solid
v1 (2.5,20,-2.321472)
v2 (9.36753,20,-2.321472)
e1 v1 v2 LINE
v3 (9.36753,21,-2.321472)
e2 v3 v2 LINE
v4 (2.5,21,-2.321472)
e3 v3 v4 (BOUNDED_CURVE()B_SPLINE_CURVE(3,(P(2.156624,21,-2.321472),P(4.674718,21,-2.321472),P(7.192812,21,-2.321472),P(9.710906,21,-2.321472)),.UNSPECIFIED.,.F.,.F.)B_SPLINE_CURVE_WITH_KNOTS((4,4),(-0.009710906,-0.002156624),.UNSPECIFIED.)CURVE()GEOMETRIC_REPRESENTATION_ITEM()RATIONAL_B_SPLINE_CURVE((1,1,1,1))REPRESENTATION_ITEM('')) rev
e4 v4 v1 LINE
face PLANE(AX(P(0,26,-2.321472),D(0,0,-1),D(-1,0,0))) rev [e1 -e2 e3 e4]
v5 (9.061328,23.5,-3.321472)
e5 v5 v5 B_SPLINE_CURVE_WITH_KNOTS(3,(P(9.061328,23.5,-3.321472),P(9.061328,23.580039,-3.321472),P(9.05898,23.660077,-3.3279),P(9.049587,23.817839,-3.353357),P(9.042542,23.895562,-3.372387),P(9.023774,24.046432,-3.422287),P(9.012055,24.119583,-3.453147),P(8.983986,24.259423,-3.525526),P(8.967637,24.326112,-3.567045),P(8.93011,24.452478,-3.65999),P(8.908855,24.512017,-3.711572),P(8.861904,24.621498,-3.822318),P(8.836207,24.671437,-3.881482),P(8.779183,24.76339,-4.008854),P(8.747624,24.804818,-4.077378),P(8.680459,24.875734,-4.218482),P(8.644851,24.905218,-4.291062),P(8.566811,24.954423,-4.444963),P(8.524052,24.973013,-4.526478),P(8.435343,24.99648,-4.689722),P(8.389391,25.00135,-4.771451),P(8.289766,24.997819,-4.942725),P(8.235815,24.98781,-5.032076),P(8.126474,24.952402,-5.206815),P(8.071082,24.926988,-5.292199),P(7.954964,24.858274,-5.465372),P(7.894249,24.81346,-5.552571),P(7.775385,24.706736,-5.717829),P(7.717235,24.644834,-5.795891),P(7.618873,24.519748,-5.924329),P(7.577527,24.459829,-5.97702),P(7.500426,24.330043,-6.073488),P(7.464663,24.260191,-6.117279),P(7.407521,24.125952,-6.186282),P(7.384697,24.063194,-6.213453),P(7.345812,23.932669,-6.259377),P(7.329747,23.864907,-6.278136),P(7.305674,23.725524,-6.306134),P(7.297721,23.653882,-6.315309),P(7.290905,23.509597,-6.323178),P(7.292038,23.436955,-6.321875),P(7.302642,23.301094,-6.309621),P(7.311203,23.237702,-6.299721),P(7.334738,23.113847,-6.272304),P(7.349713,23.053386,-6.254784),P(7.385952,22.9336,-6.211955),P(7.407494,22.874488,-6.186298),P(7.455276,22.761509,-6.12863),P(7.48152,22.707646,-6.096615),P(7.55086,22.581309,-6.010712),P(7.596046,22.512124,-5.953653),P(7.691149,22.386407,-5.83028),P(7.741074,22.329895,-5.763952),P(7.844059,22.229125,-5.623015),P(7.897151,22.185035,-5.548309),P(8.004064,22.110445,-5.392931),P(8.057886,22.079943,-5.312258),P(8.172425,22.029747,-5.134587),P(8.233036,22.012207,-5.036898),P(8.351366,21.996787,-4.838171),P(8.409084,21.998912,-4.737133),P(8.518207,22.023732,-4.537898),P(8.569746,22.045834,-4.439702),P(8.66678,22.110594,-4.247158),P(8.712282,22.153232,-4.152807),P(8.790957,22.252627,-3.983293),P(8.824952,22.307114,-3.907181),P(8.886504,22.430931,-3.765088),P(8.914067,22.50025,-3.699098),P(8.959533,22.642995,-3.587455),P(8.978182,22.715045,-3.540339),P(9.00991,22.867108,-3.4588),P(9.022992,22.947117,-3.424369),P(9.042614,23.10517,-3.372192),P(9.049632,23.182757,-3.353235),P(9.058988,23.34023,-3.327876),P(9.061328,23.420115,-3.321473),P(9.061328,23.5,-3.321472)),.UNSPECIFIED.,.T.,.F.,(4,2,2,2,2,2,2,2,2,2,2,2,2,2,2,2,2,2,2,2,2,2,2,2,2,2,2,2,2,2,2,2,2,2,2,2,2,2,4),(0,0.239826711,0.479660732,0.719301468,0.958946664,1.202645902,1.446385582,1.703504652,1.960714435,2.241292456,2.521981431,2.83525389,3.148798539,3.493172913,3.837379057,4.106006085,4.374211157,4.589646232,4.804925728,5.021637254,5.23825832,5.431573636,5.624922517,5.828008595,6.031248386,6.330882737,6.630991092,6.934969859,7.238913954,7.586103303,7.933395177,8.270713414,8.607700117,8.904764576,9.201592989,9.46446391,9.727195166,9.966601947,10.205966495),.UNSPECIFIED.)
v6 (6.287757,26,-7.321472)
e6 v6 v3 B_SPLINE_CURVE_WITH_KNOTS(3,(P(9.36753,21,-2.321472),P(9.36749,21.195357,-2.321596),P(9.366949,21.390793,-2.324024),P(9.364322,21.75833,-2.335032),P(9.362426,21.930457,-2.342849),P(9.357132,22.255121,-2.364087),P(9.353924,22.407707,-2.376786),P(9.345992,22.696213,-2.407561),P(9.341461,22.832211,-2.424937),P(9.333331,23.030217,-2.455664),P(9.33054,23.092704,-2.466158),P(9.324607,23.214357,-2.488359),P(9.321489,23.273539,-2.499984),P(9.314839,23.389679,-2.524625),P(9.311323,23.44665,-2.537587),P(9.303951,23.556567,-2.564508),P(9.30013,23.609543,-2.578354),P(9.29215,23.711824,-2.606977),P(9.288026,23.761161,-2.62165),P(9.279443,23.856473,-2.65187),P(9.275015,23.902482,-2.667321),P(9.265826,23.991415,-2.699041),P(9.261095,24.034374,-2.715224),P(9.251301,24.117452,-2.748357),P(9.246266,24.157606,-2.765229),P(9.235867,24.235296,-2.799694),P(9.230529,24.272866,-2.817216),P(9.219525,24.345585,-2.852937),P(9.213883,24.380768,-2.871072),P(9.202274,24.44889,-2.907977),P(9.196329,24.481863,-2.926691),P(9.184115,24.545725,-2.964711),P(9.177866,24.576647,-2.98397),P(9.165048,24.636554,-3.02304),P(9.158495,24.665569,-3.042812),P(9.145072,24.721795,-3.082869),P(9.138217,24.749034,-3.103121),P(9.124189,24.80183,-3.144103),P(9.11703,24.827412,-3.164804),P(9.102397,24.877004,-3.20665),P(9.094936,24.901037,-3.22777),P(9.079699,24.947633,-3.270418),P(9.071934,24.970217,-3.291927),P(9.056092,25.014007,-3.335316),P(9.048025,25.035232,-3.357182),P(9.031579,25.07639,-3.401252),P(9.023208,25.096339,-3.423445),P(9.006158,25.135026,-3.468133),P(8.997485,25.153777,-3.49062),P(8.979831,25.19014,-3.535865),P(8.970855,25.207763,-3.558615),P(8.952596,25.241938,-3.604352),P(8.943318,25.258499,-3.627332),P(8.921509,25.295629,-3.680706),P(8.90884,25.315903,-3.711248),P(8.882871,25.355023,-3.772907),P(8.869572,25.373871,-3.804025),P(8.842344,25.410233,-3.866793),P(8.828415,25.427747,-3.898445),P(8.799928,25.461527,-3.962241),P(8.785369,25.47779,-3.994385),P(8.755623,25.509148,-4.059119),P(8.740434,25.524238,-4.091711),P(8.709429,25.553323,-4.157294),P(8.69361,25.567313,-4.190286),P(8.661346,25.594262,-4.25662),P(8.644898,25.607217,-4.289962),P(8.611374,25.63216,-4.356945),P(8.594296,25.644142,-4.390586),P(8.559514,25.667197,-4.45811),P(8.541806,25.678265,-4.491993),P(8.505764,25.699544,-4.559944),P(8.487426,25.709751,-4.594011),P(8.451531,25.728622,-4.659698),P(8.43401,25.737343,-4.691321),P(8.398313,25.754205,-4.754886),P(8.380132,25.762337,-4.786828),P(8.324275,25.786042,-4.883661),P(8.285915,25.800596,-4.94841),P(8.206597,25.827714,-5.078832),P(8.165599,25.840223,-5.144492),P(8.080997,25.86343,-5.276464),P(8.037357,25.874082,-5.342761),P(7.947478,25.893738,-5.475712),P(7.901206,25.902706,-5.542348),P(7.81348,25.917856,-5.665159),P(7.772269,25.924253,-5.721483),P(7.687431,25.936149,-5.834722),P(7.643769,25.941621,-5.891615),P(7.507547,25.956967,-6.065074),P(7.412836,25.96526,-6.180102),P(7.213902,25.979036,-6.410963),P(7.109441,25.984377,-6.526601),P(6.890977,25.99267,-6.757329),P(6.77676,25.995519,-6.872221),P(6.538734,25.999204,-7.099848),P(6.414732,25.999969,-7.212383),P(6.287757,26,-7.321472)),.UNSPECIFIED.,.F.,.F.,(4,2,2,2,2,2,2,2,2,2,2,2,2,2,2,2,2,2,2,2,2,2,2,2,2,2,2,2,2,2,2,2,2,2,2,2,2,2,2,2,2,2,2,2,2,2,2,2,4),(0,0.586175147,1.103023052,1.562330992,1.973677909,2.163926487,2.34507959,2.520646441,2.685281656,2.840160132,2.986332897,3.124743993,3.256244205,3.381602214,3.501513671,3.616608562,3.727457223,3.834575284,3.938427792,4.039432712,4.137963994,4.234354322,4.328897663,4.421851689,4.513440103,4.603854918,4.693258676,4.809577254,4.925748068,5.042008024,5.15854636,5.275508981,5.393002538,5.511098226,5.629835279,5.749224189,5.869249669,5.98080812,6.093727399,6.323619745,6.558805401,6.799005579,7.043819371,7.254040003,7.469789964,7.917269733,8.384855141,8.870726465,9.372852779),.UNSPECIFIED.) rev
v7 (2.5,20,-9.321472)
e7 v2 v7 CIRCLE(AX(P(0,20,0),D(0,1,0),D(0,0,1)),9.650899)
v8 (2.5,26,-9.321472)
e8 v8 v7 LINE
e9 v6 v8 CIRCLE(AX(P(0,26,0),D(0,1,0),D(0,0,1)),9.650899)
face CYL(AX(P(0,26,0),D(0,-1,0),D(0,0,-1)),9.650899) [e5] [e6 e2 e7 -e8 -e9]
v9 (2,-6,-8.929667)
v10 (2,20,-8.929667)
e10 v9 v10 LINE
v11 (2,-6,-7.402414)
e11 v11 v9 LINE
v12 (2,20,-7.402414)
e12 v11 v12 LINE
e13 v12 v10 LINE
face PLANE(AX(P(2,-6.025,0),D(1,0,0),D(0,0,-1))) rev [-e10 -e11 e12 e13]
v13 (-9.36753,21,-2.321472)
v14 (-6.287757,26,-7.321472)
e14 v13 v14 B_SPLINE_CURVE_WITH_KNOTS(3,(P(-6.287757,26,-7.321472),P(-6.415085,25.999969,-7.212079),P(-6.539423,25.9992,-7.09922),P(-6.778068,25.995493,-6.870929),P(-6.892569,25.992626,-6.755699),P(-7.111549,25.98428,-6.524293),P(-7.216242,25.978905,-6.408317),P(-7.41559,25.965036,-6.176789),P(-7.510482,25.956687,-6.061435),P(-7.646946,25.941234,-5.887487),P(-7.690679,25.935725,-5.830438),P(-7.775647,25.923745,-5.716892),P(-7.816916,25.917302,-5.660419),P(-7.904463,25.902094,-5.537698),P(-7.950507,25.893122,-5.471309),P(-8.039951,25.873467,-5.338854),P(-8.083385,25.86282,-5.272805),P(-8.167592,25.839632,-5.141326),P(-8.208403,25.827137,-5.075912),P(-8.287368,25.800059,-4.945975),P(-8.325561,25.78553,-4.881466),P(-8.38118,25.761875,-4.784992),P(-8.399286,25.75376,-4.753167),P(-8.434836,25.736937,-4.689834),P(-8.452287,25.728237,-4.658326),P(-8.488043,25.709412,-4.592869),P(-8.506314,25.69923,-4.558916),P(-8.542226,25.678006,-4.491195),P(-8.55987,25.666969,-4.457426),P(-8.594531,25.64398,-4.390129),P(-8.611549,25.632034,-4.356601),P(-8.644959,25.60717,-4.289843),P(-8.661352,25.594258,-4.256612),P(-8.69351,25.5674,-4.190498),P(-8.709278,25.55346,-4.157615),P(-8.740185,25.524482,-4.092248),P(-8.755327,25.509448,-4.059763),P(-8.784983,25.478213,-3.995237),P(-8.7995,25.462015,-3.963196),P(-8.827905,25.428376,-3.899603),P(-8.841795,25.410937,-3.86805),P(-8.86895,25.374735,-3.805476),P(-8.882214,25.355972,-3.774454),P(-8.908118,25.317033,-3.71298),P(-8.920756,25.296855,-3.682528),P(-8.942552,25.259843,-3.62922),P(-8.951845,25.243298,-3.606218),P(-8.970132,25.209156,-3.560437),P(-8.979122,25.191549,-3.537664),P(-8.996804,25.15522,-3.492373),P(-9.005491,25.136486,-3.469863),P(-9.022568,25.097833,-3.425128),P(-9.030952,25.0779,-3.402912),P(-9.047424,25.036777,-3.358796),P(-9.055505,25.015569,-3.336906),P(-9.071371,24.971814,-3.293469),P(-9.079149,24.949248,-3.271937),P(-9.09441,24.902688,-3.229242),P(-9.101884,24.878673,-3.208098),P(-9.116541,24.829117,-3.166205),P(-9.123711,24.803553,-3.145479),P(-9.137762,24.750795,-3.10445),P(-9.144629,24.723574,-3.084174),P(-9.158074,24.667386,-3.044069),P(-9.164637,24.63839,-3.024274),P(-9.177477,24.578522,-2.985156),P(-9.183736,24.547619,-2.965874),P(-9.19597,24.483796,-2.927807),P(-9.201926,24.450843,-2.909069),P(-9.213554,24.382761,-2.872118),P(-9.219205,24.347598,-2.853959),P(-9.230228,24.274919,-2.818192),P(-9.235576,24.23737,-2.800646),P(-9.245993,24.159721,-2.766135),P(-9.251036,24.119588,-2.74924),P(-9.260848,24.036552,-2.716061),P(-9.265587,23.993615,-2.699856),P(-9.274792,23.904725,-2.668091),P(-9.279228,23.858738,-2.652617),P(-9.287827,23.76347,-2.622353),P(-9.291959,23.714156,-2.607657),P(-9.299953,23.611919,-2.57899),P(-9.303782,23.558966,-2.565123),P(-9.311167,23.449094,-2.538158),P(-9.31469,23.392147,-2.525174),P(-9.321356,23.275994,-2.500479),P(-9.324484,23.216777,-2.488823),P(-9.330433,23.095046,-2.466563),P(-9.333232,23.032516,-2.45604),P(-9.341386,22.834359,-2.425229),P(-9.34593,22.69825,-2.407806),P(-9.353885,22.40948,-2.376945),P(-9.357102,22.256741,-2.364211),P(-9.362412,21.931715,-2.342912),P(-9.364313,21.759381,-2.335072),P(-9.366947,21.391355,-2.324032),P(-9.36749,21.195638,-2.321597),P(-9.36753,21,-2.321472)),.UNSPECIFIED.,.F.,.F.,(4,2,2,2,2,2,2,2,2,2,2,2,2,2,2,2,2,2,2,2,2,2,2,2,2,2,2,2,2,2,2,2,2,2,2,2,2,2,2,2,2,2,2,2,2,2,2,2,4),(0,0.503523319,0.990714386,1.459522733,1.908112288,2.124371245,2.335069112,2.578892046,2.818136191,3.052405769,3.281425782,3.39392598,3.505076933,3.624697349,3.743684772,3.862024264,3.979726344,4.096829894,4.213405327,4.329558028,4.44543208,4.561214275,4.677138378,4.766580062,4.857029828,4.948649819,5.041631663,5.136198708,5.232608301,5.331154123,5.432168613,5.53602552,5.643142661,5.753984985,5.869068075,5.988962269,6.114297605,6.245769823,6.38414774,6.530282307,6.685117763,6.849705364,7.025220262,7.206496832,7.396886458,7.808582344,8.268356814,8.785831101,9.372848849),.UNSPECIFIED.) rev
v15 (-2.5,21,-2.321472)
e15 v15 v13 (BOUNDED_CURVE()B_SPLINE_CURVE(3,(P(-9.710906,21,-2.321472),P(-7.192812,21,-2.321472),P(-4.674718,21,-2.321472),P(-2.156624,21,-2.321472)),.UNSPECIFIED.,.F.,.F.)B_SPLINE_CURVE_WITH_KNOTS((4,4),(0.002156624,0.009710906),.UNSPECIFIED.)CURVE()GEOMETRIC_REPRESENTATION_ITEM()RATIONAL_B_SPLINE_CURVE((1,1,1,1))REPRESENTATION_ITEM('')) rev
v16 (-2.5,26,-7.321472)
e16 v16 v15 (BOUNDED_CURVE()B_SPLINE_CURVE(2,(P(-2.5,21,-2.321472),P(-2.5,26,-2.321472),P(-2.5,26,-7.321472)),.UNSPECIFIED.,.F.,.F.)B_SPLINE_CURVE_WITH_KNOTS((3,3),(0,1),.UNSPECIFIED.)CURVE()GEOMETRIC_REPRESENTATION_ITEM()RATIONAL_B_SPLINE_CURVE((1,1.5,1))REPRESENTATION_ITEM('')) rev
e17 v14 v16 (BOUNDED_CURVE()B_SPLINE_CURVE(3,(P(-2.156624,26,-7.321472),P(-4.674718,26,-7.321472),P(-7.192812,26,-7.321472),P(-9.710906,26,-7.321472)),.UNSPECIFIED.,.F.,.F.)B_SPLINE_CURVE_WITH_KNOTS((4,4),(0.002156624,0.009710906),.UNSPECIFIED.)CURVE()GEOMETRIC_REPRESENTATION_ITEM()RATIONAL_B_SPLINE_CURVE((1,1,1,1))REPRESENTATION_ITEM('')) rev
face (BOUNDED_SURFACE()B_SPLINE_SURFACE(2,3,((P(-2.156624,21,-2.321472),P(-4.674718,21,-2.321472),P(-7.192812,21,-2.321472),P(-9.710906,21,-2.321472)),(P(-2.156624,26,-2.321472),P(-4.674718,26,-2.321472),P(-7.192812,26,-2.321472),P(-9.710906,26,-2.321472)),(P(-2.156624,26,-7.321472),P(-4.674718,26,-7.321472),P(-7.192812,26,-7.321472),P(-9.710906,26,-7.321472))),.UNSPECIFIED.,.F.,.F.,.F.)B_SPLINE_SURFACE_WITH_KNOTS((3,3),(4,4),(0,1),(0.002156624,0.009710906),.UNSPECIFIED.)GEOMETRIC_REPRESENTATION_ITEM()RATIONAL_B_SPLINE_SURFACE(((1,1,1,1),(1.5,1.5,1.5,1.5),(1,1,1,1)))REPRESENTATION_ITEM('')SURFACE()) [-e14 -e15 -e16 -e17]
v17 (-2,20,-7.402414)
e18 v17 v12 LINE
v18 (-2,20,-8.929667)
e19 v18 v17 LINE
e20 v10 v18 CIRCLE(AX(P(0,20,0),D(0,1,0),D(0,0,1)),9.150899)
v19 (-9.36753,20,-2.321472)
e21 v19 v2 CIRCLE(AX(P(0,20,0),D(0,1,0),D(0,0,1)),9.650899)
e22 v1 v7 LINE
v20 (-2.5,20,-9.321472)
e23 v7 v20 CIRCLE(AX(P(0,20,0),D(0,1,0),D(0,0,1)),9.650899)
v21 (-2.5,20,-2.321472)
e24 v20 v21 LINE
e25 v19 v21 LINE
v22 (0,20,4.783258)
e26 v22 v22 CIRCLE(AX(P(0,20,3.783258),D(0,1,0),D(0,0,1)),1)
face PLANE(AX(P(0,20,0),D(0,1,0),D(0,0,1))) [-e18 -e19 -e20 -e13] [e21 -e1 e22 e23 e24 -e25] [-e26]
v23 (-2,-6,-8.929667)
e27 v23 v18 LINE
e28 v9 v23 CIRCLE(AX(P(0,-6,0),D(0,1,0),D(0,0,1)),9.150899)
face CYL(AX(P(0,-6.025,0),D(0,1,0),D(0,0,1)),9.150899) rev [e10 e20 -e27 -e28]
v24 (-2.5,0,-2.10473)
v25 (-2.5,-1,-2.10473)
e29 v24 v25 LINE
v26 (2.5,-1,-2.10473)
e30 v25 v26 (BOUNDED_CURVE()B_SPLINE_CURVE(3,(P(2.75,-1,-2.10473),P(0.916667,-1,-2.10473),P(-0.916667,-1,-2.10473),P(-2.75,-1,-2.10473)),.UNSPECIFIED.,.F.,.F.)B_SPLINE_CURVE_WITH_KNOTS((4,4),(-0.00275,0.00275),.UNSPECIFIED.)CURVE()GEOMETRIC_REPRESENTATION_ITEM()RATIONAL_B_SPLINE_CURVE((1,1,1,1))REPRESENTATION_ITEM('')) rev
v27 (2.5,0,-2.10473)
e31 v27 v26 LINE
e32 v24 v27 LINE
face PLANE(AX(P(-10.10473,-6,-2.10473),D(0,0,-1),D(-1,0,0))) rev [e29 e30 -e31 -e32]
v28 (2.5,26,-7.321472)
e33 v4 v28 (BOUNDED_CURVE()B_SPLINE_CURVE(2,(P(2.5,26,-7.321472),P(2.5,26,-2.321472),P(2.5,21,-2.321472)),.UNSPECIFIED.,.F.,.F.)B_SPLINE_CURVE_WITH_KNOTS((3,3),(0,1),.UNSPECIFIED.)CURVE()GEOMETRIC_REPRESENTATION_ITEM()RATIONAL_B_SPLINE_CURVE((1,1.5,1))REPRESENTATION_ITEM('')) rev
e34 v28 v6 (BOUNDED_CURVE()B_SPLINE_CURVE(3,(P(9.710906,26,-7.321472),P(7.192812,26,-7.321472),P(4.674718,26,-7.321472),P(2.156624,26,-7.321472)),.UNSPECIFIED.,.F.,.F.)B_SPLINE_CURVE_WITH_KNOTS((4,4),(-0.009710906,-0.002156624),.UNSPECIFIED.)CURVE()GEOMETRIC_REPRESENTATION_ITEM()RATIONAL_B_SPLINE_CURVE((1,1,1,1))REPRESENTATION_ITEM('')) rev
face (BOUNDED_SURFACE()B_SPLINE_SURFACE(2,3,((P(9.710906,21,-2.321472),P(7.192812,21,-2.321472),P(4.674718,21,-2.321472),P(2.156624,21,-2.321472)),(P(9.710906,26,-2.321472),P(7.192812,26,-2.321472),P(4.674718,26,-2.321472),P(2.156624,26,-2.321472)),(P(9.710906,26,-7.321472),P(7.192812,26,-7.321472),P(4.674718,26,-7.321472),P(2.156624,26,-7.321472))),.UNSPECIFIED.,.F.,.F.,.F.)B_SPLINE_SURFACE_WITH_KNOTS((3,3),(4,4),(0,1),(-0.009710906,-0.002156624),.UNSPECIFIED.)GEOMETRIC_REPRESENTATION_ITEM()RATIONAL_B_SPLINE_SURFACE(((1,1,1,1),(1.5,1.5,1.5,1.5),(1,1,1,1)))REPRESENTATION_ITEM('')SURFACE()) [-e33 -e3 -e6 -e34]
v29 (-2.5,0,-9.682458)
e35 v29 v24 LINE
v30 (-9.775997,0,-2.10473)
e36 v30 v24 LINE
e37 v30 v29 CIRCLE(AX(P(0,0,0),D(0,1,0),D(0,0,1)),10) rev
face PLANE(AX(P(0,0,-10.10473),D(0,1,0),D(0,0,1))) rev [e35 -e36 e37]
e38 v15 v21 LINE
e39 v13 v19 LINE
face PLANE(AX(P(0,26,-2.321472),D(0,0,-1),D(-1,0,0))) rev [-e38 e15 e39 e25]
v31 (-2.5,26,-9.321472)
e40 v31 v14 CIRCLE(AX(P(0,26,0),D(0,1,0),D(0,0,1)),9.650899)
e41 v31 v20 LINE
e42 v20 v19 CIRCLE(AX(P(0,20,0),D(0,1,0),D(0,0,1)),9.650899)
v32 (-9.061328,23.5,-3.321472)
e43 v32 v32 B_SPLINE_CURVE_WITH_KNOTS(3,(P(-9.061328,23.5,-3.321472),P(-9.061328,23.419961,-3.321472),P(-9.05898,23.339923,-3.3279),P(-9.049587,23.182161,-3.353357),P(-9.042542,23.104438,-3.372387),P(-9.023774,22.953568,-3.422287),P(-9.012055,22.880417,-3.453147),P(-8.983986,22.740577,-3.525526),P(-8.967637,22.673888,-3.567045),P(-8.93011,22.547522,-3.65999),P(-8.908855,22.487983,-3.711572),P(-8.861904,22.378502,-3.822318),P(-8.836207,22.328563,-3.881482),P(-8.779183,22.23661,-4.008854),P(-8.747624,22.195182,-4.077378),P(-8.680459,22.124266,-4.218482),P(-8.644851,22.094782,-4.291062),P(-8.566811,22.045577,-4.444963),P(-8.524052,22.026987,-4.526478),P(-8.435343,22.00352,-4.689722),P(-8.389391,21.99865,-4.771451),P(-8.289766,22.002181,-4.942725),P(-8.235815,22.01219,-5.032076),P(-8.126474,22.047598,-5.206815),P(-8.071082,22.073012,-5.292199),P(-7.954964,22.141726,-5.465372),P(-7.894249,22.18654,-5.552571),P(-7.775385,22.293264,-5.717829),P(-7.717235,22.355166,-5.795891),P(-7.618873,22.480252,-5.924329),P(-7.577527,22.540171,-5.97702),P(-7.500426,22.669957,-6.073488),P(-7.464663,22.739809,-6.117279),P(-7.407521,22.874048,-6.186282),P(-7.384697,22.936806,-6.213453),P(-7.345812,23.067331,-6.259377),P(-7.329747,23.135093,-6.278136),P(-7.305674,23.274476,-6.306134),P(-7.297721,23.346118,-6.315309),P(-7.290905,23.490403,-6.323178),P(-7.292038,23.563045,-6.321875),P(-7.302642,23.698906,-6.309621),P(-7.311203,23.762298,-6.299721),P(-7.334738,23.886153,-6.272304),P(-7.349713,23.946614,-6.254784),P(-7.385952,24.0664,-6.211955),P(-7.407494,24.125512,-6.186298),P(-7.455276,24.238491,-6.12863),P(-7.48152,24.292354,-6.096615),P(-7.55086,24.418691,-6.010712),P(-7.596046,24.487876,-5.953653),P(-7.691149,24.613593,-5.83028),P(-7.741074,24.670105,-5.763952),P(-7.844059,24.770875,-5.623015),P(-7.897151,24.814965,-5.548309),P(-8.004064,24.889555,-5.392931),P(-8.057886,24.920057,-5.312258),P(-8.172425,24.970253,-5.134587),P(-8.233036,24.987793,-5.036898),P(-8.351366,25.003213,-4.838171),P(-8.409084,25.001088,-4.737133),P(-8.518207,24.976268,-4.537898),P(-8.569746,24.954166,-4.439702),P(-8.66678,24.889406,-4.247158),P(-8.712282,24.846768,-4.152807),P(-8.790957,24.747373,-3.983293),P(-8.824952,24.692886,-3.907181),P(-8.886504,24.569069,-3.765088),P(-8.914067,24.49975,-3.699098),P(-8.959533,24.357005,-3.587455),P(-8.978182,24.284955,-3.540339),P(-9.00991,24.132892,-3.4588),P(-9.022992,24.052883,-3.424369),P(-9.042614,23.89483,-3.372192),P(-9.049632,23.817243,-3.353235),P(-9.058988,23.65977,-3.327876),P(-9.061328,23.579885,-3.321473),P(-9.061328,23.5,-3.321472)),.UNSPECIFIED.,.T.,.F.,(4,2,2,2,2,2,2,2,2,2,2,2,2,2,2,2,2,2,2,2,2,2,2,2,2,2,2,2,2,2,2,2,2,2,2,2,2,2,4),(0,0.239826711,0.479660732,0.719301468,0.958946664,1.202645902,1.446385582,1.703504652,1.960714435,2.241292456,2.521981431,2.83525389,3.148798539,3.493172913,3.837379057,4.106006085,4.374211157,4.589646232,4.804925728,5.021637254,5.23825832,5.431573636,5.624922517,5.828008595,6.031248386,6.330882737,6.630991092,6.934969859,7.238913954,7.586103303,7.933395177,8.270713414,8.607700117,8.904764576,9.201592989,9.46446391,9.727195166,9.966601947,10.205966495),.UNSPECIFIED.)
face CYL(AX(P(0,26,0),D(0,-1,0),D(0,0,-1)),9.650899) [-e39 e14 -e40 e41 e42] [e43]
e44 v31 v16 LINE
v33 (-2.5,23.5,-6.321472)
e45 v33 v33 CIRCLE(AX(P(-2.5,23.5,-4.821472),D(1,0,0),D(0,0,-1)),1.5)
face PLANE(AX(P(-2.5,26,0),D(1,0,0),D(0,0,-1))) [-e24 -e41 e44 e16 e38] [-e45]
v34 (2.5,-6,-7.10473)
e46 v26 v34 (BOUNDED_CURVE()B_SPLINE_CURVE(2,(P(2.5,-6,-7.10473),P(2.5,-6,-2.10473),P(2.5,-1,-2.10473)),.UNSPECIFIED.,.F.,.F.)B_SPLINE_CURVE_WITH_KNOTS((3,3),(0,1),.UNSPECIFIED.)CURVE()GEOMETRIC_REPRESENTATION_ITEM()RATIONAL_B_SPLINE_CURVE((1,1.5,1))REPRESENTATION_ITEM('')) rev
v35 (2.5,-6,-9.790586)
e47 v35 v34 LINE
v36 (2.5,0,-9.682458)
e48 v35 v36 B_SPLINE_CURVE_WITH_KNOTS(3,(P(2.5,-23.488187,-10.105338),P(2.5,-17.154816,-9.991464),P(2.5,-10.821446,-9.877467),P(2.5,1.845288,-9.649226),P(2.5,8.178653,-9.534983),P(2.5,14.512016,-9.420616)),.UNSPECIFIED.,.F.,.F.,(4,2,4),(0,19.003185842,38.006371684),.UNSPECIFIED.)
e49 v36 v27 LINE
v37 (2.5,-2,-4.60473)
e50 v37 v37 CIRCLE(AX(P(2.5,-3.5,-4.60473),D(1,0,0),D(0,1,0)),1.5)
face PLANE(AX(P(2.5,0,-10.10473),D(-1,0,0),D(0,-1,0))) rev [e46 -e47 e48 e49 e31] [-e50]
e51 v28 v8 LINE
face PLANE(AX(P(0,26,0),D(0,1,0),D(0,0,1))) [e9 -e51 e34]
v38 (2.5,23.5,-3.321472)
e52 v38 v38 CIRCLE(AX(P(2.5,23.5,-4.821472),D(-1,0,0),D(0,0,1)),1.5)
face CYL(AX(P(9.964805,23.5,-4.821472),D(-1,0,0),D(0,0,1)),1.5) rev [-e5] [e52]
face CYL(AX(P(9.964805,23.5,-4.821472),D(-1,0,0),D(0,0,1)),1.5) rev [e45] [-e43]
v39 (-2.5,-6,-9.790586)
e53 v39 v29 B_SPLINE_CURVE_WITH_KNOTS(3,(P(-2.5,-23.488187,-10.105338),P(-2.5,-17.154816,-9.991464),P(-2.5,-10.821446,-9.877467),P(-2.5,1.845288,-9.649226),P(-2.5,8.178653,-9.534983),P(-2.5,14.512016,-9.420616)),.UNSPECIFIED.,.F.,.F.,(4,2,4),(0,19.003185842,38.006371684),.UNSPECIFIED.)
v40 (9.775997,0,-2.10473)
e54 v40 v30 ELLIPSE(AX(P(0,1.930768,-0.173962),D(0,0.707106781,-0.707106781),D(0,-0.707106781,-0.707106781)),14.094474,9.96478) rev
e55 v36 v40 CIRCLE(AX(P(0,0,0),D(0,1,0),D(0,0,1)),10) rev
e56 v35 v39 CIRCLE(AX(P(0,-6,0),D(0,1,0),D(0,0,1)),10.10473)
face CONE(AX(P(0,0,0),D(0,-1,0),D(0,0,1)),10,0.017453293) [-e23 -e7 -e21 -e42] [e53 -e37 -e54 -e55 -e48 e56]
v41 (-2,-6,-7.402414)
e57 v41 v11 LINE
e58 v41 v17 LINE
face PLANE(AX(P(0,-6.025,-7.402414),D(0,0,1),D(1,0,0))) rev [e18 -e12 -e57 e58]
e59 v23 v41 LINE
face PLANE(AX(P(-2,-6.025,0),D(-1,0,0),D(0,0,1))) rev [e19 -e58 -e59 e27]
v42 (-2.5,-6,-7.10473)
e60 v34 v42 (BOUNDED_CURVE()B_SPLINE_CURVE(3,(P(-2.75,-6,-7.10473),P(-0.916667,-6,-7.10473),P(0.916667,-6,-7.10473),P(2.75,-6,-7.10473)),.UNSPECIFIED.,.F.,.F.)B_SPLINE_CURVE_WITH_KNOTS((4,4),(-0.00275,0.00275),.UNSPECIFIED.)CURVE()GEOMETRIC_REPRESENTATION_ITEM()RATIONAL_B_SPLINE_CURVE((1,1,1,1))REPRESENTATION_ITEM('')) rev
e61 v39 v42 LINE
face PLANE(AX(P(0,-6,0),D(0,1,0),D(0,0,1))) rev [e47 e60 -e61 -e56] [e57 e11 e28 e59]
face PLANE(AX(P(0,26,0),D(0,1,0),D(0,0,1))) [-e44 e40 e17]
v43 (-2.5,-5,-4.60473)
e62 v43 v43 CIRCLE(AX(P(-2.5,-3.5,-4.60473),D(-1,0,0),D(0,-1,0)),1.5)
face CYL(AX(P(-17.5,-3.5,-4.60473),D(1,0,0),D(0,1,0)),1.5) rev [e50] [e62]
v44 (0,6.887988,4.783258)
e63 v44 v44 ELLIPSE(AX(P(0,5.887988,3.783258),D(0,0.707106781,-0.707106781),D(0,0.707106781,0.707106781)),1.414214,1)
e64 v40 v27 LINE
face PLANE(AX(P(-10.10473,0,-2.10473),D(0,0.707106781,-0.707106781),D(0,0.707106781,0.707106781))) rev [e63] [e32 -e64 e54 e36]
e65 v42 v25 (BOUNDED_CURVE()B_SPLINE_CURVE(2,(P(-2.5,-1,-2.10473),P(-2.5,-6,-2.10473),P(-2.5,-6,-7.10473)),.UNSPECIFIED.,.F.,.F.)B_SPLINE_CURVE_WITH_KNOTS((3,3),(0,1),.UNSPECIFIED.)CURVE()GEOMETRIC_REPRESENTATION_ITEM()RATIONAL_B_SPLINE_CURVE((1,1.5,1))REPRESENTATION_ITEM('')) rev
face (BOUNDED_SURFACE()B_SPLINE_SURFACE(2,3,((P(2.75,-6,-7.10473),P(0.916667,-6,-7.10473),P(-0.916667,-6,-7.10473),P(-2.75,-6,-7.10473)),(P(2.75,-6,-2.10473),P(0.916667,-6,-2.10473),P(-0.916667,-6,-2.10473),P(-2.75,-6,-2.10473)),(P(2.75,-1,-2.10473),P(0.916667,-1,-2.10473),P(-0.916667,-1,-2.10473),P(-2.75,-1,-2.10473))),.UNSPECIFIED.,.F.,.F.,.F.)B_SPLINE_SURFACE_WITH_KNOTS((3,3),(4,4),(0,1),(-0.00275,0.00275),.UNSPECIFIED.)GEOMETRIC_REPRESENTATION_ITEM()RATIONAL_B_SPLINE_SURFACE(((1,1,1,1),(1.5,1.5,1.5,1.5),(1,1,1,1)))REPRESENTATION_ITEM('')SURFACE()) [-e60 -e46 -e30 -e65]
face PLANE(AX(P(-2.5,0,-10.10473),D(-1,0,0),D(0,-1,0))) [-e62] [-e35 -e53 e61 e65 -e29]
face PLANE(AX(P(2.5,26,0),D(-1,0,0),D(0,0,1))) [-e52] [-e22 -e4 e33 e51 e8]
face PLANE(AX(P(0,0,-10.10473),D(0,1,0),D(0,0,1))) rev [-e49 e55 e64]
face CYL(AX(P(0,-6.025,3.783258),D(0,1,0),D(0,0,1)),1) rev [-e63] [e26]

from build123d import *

# Parameters (mm, degrees)
SKETCH1_R                     = 10
BOSS_EXTRUDE1_DEPTH           = 20
BOSS_EXTRUDE1_TAPER           = 1
BOSS_EXTRUDE1_OTHER_WAY_DEPTH = 6
BOSS_EXTRUDE1_OTHER_WAY_TAPER = -1
CUT_EXTRUDE1_DEPTH            = 25.580706916
CUT_EXTRUDE1_DEPTH_BACK       = 25.580706916
SKETCH3_W                     = 8.405788387
SKETCH3_H                     = 6
SKETCH3_W_2                   = 8.899014998
CUT_EXTRUDE2_DEPTH            = 26.314759228
SKETCH4_R                     = 1.5
CUT_EXTRUDE3_DEPTH            = 20
FILLET1_SIZE                  = 5
BOSS_EXTRUDE2_DEPTH           = 6
CUT_EXTRUDE4_DEPTH            = 31.552844708
CUT_EXTRUDE4_DEPTH_BACK       = 31.552844708
SKETCH6_R                     = 1.5
FILLET2_SIZE                  = 5
SKETCH7_R                     = 1
CUT_EXTRUDE5_DEPTH            = 30.62097947
CUT_EXTRUDE6_DEPTH            = 30.62097947


with BuildPart() as part:
    # Sketch1 → Boss-Extrude1 (new body)
    with BuildSketch(Plane(origin=(0, 0, 0), x_dir=(1, 0, 0), z_dir=(0, 1, 0))):
        Circle(SKETCH1_R)
    extrude(amount=BOSS_EXTRUDE1_DEPTH, taper=BOSS_EXTRUDE1_TAPER)

    # Sketch1 → Boss-Extrude1 other way (add)
    with BuildSketch(Plane(origin=(0, 0, 0), x_dir=(1, 0, 0), z_dir=(0, 1, 0))):
        Circle(SKETCH1_R)
    extrude(amount=-BOSS_EXTRUDE1_OTHER_WAY_DEPTH, taper=BOSS_EXTRUDE1_OTHER_WAY_TAPER)

    # Sketch2 → Cut-Extrude1 (cut, two sides: drawn at the far end of the back side and taken through both)
    with BuildSketch(Plane(origin=(0, 0, 0), x_dir=(0, 0, -1), z_dir=(1, 0, 0)).offset(-CUT_EXTRUDE1_DEPTH_BACK)):
        Polygon((2.10473039, -6), (2.10473039, 0), (-12.119911375, 14.224641764), (-12.119911375, -6), align=None)
    extrude(amount=CUT_EXTRUDE1_DEPTH + CUT_EXTRUDE1_DEPTH_BACK, mode=Mode.SUBTRACT)

    # Sketch3 → Cut-Extrude2 (cut, through all)
    with BuildSketch(Plane.XY.offset(-2.10473039)):
        with Locations((-6.702894194, -3)):
            Rectangle(SKETCH3_W, SKETCH3_H)
        with Locations((6.949507499, -3)):
            Rectangle(SKETCH3_W_2, SKETCH3_H)
    extrude(amount=-CUT_EXTRUDE2_DEPTH, mode=Mode.SUBTRACT)

    # Sketch4 → Cut-Extrude3 (cut)
    with BuildSketch(Plane(origin=(2.5, 0, 0), x_dir=(0, 0, -1), z_dir=(1, 0, 0))):
        with Locations(Location((4.60473039, -3.5, 0), (0, 0, 90))):
            Circle(SKETCH4_R)
    extrude(amount=-CUT_EXTRUDE3_DEPTH, mode=Mode.SUBTRACT)

    # Fillet1
    # a fillet whose section is not a circle: 5 mm, written as the material it takes off along each edge
    with BuildSketch(Plane(origin=(15, -6, -2.10473039), x_dir=(0, 0, -1), z_dir=(-1, 0, 0))) as fillet1_piece_1:
        with BuildLine():
            Bezier((FILLET1_SIZE, 0), (0, 0), (0, -FILLET1_SIZE), weights=[1, 1.5, 1])
            Line((0, -FILLET1_SIZE), (0, 0))
            Line((0, 0), (FILLET1_SIZE, 0))
        make_face()
    extrude(amount=30, mode=Mode.SUBTRACT)

    # Sketch5 → Boss-Extrude2 (add)
    with BuildSketch(Plane(origin=(0, 20, 0), x_dir=(1, 0, 0), z_dir=(0, 1, 0))):
        with BuildLine():
            Line((-2.5, 2.321472295), (-2.5, 9.321472295))
            ThreePointArc((-2.5, 9.321472295), (-6.889090297, 6.75871886), (-9.367529671, 2.321472295))
            Line((-9.367529671, 2.321472295), (-2.5, 2.321472295))
        make_face()
        with BuildLine():
            ThreePointArc((9.367529671, 2.321472295), (6.889090297, 6.75871886), (2.5, 9.321472295))
            Line((2.5, 9.321472295), (2.5, 2.321472295))
            Line((2.5, 2.321472295), (9.367529671, 2.321472295))
        make_face()
    extrude(amount=BOSS_EXTRUDE2_DEPTH)

    # Sketch6 → Cut-Extrude4 (cut, two sides: drawn at the far end of the back side and taken through both)
    with BuildSketch(Plane.ZY.offset(-2.5).offset(-CUT_EXTRUDE4_DEPTH_BACK)):
        with Locations((-4.821472295, 23.5)):
            Circle(SKETCH6_R)
    extrude(amount=CUT_EXTRUDE4_DEPTH + CUT_EXTRUDE4_DEPTH_BACK, mode=Mode.SUBTRACT)

    # Fillet2
    # a fillet whose section is not a circle: 5 mm, written as the material it takes off along each edge
    with BuildSketch(Plane(origin=(-10, 26, -2.321472295), x_dir=(0, -1, 0), z_dir=(1, 0, 0)), Plane(origin=(-21.867529671, 26, -2.321472295), x_dir=(0, -1, 0), z_dir=(1, 0, 0))) as fillet2_piece_1:
        with BuildLine():
            Bezier((FILLET2_SIZE, 0), (0, 0), (0, FILLET2_SIZE), weights=[1, 1.5, 1])
            Line((0, FILLET2_SIZE), (0, 0))
            Line((0, 0), (FILLET2_SIZE, 0))
        make_face()
    extrude(amount=31.867529671, mode=Mode.SUBTRACT)

    # Sketch7 → Cut-Extrude5 (cut, through all)
    with BuildSketch(Plane(origin=(0, 20, 0), x_dir=(1, 0, 0), z_dir=(0, 1, 0))):
        with Locations(Location((0, -3.783258095, 0), (0, 0, 270))):
            Circle(SKETCH7_R)
    extrude(amount=-CUT_EXTRUDE5_DEPTH, mode=Mode.SUBTRACT)

    # Sketch8 → Cut-Extrude6 (cut, through all)
    with BuildSketch(Plane(origin=(0, 20, 0), x_dir=(1, 0, 0), z_dir=(0, 1, 0))):
        with BuildLine():
            Line((2, 7.402414096), (2, 8.929666682))
            ThreePointArc((2, 8.929666682), (0, 9.150898701), (-2, 8.929666682))
            Line((-2, 8.929666682), (-2, 7.402414096))
            Line((-2, 7.402414096), (2, 7.402414096))
        make_face()
    extrude(amount=-CUT_EXTRUDE6_DEPTH, mode=Mode.SUBTRACT)


solid = part.part
